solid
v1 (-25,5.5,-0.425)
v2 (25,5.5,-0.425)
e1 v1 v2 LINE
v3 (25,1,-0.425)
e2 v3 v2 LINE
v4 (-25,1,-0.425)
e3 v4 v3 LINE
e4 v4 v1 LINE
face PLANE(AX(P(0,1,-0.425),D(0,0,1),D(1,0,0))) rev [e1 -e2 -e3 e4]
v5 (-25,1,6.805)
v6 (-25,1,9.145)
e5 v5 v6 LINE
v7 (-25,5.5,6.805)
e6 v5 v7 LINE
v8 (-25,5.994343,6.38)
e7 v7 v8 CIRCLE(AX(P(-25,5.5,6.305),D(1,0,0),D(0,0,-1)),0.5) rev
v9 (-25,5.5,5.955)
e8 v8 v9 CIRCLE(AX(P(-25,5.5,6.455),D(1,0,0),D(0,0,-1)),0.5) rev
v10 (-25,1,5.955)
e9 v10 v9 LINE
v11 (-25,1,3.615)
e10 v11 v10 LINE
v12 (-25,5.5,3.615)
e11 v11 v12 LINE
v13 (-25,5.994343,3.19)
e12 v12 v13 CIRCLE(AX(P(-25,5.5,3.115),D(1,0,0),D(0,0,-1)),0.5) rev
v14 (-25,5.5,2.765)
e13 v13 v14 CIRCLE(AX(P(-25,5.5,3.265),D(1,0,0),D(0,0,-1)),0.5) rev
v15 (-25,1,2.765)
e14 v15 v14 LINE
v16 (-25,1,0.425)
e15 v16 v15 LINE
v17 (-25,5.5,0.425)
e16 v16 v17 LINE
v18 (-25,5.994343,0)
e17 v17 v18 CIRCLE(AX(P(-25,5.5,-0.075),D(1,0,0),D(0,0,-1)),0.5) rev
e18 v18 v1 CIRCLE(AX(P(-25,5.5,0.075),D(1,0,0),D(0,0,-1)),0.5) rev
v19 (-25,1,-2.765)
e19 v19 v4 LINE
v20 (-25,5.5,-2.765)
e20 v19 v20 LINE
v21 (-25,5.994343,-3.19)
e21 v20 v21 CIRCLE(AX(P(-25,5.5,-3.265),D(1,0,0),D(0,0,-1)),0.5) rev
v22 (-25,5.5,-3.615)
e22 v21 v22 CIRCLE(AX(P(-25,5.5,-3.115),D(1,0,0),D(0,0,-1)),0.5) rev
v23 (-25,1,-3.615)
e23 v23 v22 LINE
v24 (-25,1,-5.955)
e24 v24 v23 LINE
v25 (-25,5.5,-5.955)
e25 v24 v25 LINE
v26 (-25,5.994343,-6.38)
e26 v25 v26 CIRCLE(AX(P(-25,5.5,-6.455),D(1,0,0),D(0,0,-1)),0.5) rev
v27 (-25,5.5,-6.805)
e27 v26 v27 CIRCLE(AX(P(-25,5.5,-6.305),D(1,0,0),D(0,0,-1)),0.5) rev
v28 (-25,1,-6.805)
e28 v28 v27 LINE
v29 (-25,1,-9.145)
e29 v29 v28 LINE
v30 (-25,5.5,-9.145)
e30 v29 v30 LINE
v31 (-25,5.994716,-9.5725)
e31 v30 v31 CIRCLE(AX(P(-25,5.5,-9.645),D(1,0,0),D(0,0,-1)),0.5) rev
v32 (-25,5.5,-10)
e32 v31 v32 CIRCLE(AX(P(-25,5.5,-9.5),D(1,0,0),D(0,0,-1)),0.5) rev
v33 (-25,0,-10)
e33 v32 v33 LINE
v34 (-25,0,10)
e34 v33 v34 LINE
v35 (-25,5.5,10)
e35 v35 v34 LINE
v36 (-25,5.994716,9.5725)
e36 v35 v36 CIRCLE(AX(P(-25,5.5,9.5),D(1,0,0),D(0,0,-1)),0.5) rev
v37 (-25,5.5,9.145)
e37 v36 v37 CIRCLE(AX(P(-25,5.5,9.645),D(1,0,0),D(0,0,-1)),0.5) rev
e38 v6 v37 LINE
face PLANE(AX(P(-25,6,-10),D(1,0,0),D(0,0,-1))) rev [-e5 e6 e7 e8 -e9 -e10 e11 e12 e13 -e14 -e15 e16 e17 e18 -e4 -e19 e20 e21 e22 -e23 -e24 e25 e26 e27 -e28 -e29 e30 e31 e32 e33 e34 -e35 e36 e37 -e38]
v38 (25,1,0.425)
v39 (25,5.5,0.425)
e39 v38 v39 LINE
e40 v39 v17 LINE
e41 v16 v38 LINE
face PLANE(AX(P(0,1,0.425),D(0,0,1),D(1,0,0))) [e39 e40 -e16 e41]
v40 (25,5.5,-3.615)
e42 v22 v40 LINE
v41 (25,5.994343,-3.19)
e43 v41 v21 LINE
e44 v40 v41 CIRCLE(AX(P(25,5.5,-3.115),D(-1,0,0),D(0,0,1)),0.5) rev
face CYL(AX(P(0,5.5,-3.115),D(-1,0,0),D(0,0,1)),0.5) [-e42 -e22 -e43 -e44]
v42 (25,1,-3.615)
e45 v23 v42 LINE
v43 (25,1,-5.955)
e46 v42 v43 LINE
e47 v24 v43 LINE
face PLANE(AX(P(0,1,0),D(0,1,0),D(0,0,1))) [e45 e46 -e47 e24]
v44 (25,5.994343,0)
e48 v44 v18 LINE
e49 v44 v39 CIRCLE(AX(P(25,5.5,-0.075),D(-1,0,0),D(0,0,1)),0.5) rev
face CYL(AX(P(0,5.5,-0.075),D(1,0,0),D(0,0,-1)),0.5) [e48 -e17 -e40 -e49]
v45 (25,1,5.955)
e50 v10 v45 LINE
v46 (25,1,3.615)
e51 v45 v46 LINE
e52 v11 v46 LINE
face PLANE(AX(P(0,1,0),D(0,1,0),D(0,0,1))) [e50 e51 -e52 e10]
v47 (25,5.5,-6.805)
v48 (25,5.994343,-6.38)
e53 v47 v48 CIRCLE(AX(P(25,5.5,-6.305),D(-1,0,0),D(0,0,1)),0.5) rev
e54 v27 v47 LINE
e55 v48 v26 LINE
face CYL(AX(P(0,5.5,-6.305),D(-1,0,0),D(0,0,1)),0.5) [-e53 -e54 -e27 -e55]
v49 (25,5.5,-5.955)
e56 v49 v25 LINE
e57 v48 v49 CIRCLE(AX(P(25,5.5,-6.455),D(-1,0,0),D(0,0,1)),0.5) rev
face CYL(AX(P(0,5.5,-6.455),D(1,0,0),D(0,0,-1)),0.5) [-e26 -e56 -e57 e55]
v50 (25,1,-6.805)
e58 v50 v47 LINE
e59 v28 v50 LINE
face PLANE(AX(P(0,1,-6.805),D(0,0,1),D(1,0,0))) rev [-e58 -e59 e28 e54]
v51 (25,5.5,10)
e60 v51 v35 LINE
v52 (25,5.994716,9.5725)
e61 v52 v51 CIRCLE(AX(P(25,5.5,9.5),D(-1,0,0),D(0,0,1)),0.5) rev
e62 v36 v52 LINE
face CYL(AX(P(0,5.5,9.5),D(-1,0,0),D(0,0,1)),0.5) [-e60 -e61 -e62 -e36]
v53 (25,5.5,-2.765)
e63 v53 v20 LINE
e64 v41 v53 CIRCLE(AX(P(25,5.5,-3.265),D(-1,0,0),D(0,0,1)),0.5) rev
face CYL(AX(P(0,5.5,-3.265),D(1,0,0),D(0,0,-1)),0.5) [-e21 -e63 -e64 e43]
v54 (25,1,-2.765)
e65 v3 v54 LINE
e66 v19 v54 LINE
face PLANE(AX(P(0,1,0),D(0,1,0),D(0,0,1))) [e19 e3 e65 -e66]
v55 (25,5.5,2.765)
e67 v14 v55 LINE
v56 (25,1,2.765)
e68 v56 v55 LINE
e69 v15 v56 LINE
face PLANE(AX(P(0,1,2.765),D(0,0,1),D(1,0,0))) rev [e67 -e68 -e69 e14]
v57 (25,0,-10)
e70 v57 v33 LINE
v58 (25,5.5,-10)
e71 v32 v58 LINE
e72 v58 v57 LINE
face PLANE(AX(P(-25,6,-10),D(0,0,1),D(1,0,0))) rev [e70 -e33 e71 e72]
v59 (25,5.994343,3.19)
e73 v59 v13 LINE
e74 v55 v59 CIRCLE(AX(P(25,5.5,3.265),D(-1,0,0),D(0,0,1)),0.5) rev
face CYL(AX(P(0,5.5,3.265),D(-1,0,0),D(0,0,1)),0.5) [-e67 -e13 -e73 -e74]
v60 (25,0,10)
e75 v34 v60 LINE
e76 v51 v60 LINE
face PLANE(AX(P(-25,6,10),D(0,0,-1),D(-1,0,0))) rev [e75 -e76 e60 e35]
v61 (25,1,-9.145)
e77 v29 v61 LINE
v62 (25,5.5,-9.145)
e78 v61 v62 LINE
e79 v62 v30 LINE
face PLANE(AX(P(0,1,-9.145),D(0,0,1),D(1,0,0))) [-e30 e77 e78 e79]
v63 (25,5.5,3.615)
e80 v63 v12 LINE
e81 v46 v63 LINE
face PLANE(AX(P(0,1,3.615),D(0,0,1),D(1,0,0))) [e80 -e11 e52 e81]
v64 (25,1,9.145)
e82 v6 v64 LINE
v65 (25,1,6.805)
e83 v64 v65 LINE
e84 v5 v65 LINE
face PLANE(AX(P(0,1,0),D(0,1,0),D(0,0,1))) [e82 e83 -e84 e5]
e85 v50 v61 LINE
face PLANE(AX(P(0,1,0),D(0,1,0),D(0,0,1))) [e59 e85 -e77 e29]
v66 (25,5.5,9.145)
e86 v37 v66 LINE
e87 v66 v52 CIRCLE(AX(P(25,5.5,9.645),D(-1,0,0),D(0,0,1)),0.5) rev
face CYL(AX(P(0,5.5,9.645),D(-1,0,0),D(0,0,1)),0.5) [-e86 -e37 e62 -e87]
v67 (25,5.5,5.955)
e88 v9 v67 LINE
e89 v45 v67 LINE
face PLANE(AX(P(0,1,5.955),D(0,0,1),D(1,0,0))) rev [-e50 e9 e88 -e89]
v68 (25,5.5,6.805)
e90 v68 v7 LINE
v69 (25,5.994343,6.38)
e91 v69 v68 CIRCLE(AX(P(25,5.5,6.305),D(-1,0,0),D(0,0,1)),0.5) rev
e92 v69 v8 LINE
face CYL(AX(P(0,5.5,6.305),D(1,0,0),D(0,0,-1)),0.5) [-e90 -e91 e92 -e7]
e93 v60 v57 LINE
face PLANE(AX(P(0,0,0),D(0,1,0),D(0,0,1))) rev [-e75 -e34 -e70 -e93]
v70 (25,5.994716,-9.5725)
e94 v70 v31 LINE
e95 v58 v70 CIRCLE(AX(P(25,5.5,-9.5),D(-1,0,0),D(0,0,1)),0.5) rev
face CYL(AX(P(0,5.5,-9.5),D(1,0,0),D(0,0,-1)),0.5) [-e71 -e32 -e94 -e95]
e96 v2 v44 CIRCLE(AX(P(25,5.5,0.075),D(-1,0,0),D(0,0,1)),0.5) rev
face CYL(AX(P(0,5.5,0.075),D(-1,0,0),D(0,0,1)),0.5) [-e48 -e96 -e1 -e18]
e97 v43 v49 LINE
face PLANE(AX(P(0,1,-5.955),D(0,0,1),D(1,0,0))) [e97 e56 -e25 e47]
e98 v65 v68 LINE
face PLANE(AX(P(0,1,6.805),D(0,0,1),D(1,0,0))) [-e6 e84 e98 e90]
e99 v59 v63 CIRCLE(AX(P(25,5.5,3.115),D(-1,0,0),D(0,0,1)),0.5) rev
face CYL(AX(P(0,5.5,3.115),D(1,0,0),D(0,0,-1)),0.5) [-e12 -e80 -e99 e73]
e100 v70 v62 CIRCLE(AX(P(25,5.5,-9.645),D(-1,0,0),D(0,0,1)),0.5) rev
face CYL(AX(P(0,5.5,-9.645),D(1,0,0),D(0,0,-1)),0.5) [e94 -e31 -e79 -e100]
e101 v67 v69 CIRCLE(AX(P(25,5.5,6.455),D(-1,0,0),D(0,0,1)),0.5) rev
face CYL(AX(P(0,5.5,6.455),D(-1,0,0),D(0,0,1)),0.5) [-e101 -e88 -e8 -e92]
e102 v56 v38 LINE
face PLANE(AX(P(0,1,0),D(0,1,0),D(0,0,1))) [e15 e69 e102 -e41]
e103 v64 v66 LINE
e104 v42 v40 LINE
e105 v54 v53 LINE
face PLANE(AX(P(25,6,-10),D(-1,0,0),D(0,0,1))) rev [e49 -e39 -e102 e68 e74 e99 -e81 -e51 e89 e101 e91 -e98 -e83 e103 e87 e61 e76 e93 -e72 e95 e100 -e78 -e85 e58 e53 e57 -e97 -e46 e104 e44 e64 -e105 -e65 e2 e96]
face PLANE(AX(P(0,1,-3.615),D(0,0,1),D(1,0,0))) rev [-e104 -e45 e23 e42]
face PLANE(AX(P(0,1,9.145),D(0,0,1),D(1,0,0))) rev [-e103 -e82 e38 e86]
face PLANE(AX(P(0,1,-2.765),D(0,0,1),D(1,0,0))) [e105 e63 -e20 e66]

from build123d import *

# Parameters (mm, degrees)
SKETCH_1_W          = 50
SKETCH_1_H          = 20
EXTRUDE_1_DEPTH     = 6
SKETCH_2_W          = 50
SKETCH_2_H          = 2.34
CUT_EXTRUDE_1_DEPTH = 5
FILLET_1_R          = 0.5


with BuildPart() as part:
    # 草图1 → 凸台-拉伸1 (new body)
    with BuildSketch(Plane(origin=(0, 0, 0), x_dir=(1, 0, 0), z_dir=(0, 1, 0))):
        Rectangle(SKETCH_1_W, SKETCH_1_H)
    extrude(amount=EXTRUDE_1_DEPTH)

    # 草图2 → 切除-拉伸1 (cut)
    with BuildSketch(Plane(origin=(0, 6, 0), x_dir=(1, 0, 0), z_dir=(0, 1, 0))):
        with Locations((0, 1.595)):
            Rectangle(SKETCH_2_W, SKETCH_2_H)
        with Locations((0, -1.595)):
            Rectangle(SKETCH_2_W, SKETCH_2_H)
        with Locations((0, 4.785)):
            Rectangle(SKETCH_2_W, SKETCH_2_H)
        with Locations((0, -4.785)):
            Rectangle(SKETCH_2_W, SKETCH_2_H)
        with Locations((0, 7.975)):
            Rectangle(SKETCH_2_W, SKETCH_2_H)
        with Locations((0, -7.975)):
            Rectangle(SKETCH_2_W, SKETCH_2_H)
    extrude(amount=-CUT_EXTRUDE_1_DEPTH, mode=Mode.SUBTRACT)

    # 圆角1
    # the kernel refuses this fillet: 0.5 mm, written as the material it takes off along each edge
    with BuildSketch(Plane(origin=(26.25, 6, 10), x_dir=(0, 0, -1), z_dir=(-1, 0, 0)), Plane(origin=(26.25, 6, 6.805), x_dir=(0, 0, -1), z_dir=(-1, 0, 0)), Plane(origin=(26.25, 6, 3.615), x_dir=(0, 0, -1), z_dir=(-1, 0, 0)), Plane(origin=(26.25, 6, 0.425), x_dir=(0, 0, -1), z_dir=(-1, 0, 0)), Plane(origin=(26.25, 6, -2.765), x_dir=(0, 0, -1), z_dir=(-1, 0, 0)), Plane(origin=(26.25, 6, -5.955), x_dir=(0, 0, -1), z_dir=(-1, 0, 0)), Plane(origin=(26.25, 6, -9.145), x_dir=(0, 0, -1), z_dir=(-1, 0, 0))) as fillet_1_piece_1:
        with BuildLine():
            CenterArc((FILLET_1_R, FILLET_1_R), FILLET_1_R, 180, 90)
            Line((0, FILLET_1_R), (0, 0))
            Line((0, 0), (FILLET_1_R, 0))
        make_face()
    extrude(amount=52.5, mode=Mode.SUBTRACT)
    with BuildSketch(Plane(origin=(-26.25, 6, -10), x_dir=(0, -1, 0), z_dir=(1, 0, 0)), Plane(origin=(-26.25, 6, 9.145), x_dir=(0, -1, 0), z_dir=(1, 0, 0)), Plane(origin=(-26.25, 6, 5.955), x_dir=(0, -1, 0), z_dir=(1, 0, 0)), Plane(origin=(-26.25, 6, 2.765), x_dir=(0, -1, 0), z_dir=(1, 0, 0)), Plane(origin=(-26.25, 6, -0.425), x_dir=(0, -1, 0), z_dir=(1, 0, 0)), Plane(origin=(-26.25, 6, -3.615), x_dir=(0, -1, 0), z_dir=(1, 0, 0)), Plane(origin=(-26.25, 6, -6.805), x_dir=(0, -1, 0), z_dir=(1, 0, 0))) as fillet_1_piece_2:
        with BuildLine():
            CenterArc((FILLET_1_R, -FILLET_1_R), FILLET_1_R, 90, 90)
            Line((0, -FILLET_1_R), (0, 0))
            Line((0, 0), (FILLET_1_R, 0))
        make_face()
    extrude(amount=52.5, mode=Mode.SUBTRACT)


solid = part.part
